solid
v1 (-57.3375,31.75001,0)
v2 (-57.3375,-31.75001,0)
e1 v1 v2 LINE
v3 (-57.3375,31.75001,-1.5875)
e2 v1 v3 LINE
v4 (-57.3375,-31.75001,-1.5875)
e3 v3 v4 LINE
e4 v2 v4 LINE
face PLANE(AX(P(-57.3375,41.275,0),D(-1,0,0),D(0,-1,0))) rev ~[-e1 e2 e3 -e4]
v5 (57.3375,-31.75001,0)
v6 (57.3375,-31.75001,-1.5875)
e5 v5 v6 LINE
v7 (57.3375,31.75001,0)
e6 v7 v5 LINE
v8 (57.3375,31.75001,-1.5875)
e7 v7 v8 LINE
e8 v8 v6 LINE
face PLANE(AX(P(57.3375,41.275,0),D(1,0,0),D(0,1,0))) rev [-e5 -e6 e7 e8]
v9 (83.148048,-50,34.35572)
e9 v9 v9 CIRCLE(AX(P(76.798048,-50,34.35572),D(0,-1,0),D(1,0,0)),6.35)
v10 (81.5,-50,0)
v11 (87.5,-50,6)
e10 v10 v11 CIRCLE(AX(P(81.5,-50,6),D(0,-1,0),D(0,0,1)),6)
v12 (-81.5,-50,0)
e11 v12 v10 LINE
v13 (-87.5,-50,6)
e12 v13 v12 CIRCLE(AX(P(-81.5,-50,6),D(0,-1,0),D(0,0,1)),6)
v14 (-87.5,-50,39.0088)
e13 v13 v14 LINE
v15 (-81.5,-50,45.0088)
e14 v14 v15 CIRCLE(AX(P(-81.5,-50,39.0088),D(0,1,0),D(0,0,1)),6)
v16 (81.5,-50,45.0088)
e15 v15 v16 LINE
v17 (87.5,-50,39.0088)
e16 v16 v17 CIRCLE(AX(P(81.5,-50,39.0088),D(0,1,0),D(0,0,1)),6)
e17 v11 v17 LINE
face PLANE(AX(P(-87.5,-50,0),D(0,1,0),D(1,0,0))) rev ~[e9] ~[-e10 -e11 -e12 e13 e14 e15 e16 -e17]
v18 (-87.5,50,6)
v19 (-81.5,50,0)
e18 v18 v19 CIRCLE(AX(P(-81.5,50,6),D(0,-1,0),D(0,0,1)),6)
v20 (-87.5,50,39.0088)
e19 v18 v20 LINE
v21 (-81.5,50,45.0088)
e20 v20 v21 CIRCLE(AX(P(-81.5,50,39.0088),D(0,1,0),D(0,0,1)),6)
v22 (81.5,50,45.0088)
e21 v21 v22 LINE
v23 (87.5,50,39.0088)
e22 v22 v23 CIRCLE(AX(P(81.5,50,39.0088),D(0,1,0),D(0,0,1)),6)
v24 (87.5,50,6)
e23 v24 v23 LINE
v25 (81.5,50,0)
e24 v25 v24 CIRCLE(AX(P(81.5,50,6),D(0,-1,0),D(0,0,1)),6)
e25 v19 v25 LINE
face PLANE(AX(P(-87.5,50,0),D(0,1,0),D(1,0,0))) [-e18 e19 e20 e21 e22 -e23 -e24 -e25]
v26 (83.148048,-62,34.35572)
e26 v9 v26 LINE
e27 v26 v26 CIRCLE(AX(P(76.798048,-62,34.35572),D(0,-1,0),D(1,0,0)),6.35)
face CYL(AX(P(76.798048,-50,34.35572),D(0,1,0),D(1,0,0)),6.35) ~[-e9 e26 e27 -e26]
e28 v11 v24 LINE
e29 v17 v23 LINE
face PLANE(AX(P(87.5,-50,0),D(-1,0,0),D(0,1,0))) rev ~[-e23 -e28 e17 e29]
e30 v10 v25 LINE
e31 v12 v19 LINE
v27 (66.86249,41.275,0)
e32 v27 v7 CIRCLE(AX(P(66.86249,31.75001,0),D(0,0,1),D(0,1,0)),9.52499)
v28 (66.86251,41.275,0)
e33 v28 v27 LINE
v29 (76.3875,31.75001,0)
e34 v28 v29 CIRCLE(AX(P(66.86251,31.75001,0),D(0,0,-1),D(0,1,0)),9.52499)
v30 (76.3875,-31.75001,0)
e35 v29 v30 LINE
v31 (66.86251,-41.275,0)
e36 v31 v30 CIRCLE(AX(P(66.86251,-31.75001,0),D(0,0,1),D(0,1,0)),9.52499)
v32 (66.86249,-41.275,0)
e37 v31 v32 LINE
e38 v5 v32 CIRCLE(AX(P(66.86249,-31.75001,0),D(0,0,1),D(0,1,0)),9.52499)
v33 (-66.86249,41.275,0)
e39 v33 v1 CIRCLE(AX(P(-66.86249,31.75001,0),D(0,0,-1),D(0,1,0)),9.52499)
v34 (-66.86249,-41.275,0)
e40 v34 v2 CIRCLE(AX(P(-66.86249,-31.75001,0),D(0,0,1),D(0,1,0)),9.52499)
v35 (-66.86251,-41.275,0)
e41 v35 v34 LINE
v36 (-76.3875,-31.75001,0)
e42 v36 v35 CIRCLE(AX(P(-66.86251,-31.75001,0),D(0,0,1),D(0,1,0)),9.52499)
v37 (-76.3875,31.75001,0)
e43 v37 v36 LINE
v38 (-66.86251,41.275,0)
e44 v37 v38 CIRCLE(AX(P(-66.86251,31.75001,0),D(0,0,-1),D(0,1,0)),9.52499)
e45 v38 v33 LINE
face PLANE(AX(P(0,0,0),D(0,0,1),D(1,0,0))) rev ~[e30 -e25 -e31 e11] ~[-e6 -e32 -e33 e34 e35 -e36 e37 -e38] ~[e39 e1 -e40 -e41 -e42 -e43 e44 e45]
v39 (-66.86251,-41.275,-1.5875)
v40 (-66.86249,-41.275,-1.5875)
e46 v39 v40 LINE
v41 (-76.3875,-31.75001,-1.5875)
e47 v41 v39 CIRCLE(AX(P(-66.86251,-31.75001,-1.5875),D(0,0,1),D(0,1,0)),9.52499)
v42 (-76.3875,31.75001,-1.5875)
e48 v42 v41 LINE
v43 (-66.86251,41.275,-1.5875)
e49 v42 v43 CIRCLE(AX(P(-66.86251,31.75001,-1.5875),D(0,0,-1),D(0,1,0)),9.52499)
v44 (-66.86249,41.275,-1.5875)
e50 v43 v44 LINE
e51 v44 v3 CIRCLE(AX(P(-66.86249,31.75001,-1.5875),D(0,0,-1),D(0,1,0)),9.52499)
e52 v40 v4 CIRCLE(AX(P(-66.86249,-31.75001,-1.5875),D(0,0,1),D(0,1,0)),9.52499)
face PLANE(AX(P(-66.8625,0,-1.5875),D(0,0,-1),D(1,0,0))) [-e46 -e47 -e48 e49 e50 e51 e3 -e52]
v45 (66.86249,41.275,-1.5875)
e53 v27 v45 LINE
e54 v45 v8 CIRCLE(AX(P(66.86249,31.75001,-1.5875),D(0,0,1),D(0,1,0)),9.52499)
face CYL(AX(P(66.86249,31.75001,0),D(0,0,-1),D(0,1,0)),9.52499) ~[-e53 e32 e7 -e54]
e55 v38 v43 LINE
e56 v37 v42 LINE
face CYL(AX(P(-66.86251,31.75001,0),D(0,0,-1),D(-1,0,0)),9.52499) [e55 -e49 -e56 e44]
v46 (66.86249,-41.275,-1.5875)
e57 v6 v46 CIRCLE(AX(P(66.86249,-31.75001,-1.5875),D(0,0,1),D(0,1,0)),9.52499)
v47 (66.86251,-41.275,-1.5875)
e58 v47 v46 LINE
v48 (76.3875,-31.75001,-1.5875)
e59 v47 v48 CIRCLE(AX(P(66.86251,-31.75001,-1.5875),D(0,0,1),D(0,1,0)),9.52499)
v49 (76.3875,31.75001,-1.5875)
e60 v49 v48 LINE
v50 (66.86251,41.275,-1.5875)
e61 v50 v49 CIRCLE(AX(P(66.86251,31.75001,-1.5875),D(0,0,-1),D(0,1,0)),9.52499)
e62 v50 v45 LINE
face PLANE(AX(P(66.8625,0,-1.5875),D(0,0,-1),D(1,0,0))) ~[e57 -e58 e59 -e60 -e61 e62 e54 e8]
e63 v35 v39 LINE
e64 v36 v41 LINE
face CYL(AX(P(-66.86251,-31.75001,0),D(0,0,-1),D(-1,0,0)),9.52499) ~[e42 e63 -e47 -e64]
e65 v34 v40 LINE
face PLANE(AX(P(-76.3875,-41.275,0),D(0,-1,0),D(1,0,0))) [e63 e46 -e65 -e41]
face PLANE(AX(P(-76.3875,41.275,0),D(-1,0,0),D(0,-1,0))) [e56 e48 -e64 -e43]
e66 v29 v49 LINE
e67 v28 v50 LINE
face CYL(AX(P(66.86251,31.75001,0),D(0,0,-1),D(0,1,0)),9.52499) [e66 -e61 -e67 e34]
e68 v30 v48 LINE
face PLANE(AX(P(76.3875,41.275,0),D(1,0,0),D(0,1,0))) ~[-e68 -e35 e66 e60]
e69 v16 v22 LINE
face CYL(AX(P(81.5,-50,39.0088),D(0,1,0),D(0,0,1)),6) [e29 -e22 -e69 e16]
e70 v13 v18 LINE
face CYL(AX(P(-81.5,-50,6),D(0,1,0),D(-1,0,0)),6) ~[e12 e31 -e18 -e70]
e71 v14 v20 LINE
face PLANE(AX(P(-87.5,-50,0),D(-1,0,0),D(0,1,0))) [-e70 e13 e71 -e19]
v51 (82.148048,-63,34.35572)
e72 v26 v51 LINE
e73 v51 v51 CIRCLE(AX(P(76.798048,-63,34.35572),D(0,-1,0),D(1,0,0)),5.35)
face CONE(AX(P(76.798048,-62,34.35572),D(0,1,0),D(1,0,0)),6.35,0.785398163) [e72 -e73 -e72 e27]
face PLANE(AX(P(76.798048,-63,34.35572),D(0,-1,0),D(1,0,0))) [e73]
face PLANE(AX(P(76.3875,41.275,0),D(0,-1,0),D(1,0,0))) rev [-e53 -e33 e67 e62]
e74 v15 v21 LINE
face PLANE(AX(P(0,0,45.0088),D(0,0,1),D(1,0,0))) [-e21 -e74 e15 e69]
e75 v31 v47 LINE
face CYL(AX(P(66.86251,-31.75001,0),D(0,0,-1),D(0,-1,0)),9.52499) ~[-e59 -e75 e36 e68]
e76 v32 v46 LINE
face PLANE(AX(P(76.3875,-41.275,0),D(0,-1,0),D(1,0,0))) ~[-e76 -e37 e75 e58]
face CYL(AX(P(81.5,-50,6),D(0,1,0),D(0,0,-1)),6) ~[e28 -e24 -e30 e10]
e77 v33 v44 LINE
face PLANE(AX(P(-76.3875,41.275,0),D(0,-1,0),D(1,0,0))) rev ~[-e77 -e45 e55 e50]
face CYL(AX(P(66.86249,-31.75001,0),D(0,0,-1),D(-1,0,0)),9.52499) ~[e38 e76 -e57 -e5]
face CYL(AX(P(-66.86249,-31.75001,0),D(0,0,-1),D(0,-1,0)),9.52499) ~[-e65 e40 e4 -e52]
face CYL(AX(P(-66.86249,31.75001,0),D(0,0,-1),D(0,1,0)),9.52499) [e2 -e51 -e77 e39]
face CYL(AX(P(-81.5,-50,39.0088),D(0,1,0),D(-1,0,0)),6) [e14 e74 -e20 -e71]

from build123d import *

# Parameters (mm, degrees)
F0_W     = 175
F0_H     = 100
F1_DEPTH = 45.0088
F2_R     = 6.35
F3_DEPTH = 13
F4_SIZE  = 1
F5_R     = 6
F6_W     = 19.05
F6_H     = 82.55
F7_DEPTH = 1.5875
F8_R     = 9.52499


# Not quite as in the source:
# - a fillet or chamfer is up to 0.001 mm smaller than in the source, because OpenCascade refuses the exact size
# - a length typed as a fraction of an inch, garbled in the dataset ("3 / 203.2 mm" for 3/8 in), is restored
# - a pattern or mirror of a feature is missing from the dataset's text; its kind, count and spacing are read off the source's solid


with BuildPart() as f1:
    # F0 (on Top) → F1 (new body)
    with BuildSketch(Plane.XY):
        Rectangle(F0_W, F0_H)
    extrude(amount=F1_DEPTH)

    # F2 (on face) → F3 (join)
    with BuildSketch(Plane.XZ.offset(50)):
        with Locations((76.7980482321, 34.3557204665)):
            Circle(F2_R)
    extrude(amount=F3_DEPTH)

    # F4
    f4_edges = [f1.edges().sort_by_distance(p)[0] for p in [
        (70.448048, -63, 34.35572),
    ]]
    chamfer(f4_edges, length=F4_SIZE)

    # F5
    f5_edges = [f1.edges().sort_by_distance(p)[0] for p in [
        (-87.5, 0, 45.0088),
        (87.5, 0, 45.0088),
        (87.5, 0, 0),
        (-87.5, 0, 0),
    ]]
    fillet(f5_edges, radius=F5_R)

    # F6 (on face) → F7 (join)
    with BuildSketch(Plane(origin=(0, 0, 0), x_dir=(1, 0, 0), z_dir=(0, 0, -1))):
        with Locations((-66.8625, 0)):
            Rectangle(F6_W, F6_H)
    f7 = extrude(amount=F7_DEPTH)

    # F7_copies: F7 across plane
    add(f7.mirror(Plane(origin=(0, 0, 0), x_dir=(0, 0, 1), z_dir=(1, 0, 0))))

    # F8 (radius 9.525 in the source; OpenCascade refuses exactly that, so slightly less here)
    f8_edges = [f1.edges().sort_by_distance(p)[0] for p in [
        (-76.3875, -41.275, -0.79375),
        (-57.3375, -41.275, -0.79375),
        (-76.3875, 41.275, -0.79375),
        (-57.3375, 41.275, -0.79375),
        (76.3875, -41.275, -0.79375),
        (76.3875, 41.275, -0.79375),
        (57.3375, 41.275, -0.79375),
        (57.3375, -41.275, -0.79375),
    ]]
    fillet(f8_edges, radius=F8_R)


solid = f1.part
